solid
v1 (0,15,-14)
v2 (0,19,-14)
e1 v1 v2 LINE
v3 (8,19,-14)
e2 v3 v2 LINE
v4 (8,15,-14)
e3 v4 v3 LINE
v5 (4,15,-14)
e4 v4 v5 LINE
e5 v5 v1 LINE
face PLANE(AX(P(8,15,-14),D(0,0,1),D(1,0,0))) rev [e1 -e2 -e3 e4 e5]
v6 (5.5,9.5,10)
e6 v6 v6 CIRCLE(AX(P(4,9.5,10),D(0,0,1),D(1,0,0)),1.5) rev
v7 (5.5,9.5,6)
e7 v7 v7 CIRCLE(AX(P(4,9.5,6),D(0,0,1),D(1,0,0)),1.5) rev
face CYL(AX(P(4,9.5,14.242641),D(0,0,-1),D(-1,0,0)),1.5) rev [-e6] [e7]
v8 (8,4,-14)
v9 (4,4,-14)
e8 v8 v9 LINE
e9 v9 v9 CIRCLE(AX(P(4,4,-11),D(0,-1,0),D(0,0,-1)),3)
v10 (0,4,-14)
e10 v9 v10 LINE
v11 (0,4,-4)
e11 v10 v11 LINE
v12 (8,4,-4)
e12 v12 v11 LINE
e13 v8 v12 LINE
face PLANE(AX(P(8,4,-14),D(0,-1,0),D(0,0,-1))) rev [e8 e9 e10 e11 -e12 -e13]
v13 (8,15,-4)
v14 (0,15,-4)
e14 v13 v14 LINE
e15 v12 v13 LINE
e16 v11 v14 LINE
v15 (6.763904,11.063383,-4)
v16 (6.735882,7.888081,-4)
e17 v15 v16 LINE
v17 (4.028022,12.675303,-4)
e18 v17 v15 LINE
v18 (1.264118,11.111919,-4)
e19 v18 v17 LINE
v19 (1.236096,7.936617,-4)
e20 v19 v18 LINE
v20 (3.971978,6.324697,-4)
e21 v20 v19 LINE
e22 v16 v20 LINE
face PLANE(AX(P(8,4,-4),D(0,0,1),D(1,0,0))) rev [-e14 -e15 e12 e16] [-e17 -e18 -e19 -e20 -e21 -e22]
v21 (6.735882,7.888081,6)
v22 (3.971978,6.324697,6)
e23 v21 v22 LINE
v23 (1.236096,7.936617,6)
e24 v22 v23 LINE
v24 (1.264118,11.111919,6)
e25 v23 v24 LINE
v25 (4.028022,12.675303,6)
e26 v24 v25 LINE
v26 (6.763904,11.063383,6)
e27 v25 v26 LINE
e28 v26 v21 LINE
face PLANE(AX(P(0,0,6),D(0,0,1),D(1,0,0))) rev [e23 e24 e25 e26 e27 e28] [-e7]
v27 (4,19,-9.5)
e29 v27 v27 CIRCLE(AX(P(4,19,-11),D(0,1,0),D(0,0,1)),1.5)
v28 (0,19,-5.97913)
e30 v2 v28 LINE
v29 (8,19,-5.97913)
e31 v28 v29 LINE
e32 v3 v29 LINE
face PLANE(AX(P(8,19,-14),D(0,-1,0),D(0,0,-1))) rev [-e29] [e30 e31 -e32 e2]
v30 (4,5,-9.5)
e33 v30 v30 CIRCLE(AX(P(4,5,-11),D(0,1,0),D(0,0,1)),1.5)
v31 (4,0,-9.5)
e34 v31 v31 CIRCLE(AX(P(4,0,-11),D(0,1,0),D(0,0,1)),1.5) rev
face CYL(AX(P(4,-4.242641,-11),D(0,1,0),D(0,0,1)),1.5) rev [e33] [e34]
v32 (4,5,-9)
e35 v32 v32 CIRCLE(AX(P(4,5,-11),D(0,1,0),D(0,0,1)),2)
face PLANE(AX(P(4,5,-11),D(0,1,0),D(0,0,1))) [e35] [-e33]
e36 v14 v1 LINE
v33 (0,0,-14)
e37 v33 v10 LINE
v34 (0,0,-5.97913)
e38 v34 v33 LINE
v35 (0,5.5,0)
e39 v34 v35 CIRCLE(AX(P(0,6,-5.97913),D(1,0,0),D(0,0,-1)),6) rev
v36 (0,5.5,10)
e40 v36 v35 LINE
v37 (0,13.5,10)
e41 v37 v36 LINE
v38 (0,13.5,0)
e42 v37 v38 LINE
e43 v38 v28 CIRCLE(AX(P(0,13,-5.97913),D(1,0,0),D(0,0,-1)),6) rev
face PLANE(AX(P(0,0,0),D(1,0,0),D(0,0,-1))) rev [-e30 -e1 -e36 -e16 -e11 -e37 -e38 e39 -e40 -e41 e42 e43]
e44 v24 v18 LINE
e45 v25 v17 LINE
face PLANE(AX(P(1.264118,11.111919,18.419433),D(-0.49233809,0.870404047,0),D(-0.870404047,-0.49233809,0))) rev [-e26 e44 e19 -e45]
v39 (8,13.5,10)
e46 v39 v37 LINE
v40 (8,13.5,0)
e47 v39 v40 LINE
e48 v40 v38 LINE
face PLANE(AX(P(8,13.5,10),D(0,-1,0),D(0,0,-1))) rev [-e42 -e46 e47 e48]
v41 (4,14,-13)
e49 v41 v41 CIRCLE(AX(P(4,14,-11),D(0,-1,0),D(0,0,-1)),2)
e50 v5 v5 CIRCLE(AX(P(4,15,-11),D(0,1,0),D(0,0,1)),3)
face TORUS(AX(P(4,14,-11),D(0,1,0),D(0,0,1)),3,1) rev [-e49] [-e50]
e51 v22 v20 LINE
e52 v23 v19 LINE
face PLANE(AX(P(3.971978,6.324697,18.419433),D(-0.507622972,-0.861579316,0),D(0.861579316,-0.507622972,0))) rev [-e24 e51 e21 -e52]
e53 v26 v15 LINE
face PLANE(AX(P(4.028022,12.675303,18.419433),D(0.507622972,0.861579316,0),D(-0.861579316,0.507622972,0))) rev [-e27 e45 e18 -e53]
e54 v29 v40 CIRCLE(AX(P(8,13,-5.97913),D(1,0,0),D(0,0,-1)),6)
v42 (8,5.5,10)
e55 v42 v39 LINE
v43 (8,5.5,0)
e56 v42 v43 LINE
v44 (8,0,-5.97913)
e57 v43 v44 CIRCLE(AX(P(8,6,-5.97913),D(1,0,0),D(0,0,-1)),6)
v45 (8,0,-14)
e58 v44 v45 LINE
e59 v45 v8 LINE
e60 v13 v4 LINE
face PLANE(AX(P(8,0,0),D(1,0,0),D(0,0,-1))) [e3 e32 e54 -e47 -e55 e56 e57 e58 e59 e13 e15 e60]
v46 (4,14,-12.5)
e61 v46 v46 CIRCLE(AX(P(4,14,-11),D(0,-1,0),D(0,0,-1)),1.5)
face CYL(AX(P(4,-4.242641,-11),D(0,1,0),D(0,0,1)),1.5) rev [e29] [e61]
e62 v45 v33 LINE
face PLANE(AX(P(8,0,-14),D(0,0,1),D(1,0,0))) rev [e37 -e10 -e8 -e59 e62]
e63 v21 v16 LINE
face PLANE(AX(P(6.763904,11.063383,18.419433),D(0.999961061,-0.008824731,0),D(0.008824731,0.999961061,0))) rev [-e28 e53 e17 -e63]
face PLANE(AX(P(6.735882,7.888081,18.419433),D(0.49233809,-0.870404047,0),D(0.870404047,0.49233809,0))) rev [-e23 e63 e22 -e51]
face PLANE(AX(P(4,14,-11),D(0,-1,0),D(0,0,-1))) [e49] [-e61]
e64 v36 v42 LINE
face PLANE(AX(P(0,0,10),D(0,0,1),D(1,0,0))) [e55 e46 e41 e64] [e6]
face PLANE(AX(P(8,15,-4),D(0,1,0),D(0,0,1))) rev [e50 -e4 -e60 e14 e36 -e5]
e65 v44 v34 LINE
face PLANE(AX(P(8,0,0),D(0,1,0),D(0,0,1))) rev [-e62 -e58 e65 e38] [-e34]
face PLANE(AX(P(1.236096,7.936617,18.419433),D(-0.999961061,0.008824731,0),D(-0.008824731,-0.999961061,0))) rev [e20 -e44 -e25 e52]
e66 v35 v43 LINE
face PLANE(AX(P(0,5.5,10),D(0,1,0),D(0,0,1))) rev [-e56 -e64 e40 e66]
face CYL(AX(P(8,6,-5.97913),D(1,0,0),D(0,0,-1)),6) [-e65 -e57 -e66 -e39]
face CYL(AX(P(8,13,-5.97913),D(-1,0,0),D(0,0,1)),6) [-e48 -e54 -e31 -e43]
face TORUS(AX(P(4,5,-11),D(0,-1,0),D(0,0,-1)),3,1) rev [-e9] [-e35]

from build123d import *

# Parameters (mm, degrees)
EXTRUDE_1_DEPTH     = 8
CUT_EXTRUDE_1_REACH = 26.92
SKETCH_4_R          = 1.5
EXTRUDE_START       = 1
SKETCH_5_R          = 2
SKETCH_5_R_2        = 1.5
EXTRUDE_2_DEPTH     = 1
SKETCH_6_R          = 2
SKETCH_6_R_2        = 1.5
EXTRUDE_3_DEPTH     = 1
FILLET_1_R          = 1
FILLET_2_R          = 1
SKETCH_10_W         = 8
SKETCH_10_H         = 8
EXTRUDE_5_DEPTH     = 10
SKETCH_7_R          = 1.5
CUT_EXTRUDE_2_DEPTH = 14
CUT_EXTRUDE_3_DEPTH = 10
FILLET_3_R          = 6
FILLET_4_R          = 6


# Some blends are built 0.0001 mm under size
with BuildPart() as part:
    # Эскиз3 → Бобышка-Вытянуть1 (new body)
    with BuildSketch(Plane(origin=(0, 0, 0), x_dir=(0, 0, -1), z_dir=(1, 0, 0))):
        Polygon((0, 0), (14, 0), (14, 4), (4, 4), (4, 15), (14, 15), (14, 19), (0, 19), align=None)
    extrude(amount=EXTRUDE_1_DEPTH)

    # Вырез-Вытянуть1: up to this face of the body (flat: up to its plane)
    cut_extrude_1_end = Plane(part.part.faces().sort_by_distance((4, 0, -7))[0])
    # Эскиз4 → Вырез-Вытянуть1 (cut, up to the picked face)
    with BuildSketch(Plane(origin=(0, 19, 0), x_dir=(1, 0, 0), z_dir=(0, 1, 0)), mode=Mode.PRIVATE) as cut_extrude_1_sk1:
        with Locations(Location((4, 11, 0), (0, 0, 270))):
            Circle(SKETCH_4_R)
    cut_extrude_1_tool1 = split(extrude(cut_extrude_1_sk1.sketch, amount=-CUT_EXTRUDE_1_REACH, mode=Mode.PRIVATE), bisect_by=cut_extrude_1_end, keep=Keep.BOTH, mode=Mode.PRIVATE)
    add(cut_extrude_1_tool1.solids().sort_by(Axis((4, 19, -11), (0, -1, 0)))[0], mode=Mode.SUBTRACT)

    # Эскиз5 → Бобышка-Вытянуть2 (add)
    with BuildSketch(Plane(origin=(0, 4, 0), x_dir=(1, 0, 0), z_dir=(0, 1, 0)).offset(EXTRUDE_START)):
        with Locations(Location((4, 11, 0), (0, 0, 90))):
            Circle(SKETCH_5_R)
        with Locations(Location((4, 11, 0), (0, 0, 270))):
            Circle(SKETCH_5_R_2, mode=Mode.SUBTRACT)
    extrude(amount=-EXTRUDE_2_DEPTH)

    # Эскиз6 → Бобышка-Вытянуть3 (add)
    with BuildSketch(Plane(origin=(0, 15, 0), x_dir=(-1, 0, 0), z_dir=(0, -1, 0))):
        with Locations(Location((-4, 11, 0), (0, 0, 90))):
            Circle(SKETCH_6_R)
        with Locations(Location((-4, 11, 0), (0, 0, 270))):
            Circle(SKETCH_6_R_2, mode=Mode.SUBTRACT)
    extrude(amount=EXTRUDE_3_DEPTH)

    # Скругление1
    fillet_1_edges = [part.edges().sort_by_distance(p)[0] for p in [
        (4, 4, -9),
    ]]
    fillet(fillet_1_edges, radius=FILLET_1_R - 0.0001)  # a hair under: the kernel refuses the full size

    # Скругление2
    fillet_2_edges = [part.edges().sort_by_distance(p)[0] for p in [
        (4, 15, -9),
    ]]
    fillet(fillet_2_edges, radius=FILLET_2_R - 0.0001)  # a hair under: the kernel refuses the full size

    # Эскиз10 → Бобышка-Вытянуть5 (add)
    with BuildSketch(Plane.XY):
        with Locations((4, 9.5)):
            Rectangle(SKETCH_10_W, SKETCH_10_H)
    extrude(amount=EXTRUDE_5_DEPTH)

    # Эскиз7 → Вырез-Вытянуть2 (cut)
    with BuildSketch(Plane(origin=(0, 0, -4), x_dir=(-1, 0, 0), z_dir=(0, 0, -1))):
        with Locations((-4, 9.5)):
            Circle(SKETCH_7_R)
    extrude(amount=-CUT_EXTRUDE_2_DEPTH, mode=Mode.SUBTRACT)

    # Эскиз9 → Вырез-Вытянуть3 (cut)
    with BuildSketch(Plane(origin=(0, 0, -4), x_dir=(-1, 0, 0), z_dir=(0, 0, -1))):
        Polygon((-1.264118223, 11.111919426), (-4.028022284, 12.675302834), (-6.763904061, 11.063383407), (-6.735881777, 7.888080574), (-3.971977716, 6.324697166), (-1.236095939, 7.936616593), align=None)
    extrude(amount=-CUT_EXTRUDE_3_DEPTH, mode=Mode.SUBTRACT)

    # Скругление3
    # the kernel refuses this fillet: 6 mm, written as the material it takes off along each edge
    with BuildSketch(Plane(origin=(-14.947825929, 19, 0), x_dir=(0, 0, -1), z_dir=(1, 0, 0))) as fillet_3_piece_1:
        with BuildLine():
            CenterArc((5.979130372, -6), FILLET_3_R, 90, 85.219808153)
            Line((0, -5.5), (-0.119582607, -5.49))
            ThreePointArc((-0.119582607, -5.49), (-0.12, -2.75), (-0.12, 0))
            Line((-0.12, 0), (0, 0.12))
            Line((0, 0.12), (5.979130372, 0.12))
            Line((5.979130372, 0.12), (5.979130372, 0))
        make_face()
    extrude(amount=37.895651858, mode=Mode.SUBTRACT)

    # Скругление4
    # the kernel refuses this fillet: 6 mm, written as the material it takes off along each edge
    with BuildSketch(Plane(origin=(-14.947825929, 0, 0), x_dir=(0, 1, 0), z_dir=(1, 0, 0))) as fillet_4_piece_1:
        with BuildLine():
            CenterArc((6, -5.979130372), FILLET_4_R, 94.780191847, 85.219808153)
            Line((0, -5.979130372), (-0.12, -5.979130372))
            Line((-0.12, -5.979130372), (-0.12, 0))
            Line((-0.12, 0), (0, 0.12))
            ThreePointArc((0, 0.12), (2.75, 0.12), (5.49, 0.119582607))
            Line((5.49, 0.119582607), (5.5, 0))
        make_face()
    extrude(amount=37.895651858, mode=Mode.SUBTRACT)


solid = part.part
